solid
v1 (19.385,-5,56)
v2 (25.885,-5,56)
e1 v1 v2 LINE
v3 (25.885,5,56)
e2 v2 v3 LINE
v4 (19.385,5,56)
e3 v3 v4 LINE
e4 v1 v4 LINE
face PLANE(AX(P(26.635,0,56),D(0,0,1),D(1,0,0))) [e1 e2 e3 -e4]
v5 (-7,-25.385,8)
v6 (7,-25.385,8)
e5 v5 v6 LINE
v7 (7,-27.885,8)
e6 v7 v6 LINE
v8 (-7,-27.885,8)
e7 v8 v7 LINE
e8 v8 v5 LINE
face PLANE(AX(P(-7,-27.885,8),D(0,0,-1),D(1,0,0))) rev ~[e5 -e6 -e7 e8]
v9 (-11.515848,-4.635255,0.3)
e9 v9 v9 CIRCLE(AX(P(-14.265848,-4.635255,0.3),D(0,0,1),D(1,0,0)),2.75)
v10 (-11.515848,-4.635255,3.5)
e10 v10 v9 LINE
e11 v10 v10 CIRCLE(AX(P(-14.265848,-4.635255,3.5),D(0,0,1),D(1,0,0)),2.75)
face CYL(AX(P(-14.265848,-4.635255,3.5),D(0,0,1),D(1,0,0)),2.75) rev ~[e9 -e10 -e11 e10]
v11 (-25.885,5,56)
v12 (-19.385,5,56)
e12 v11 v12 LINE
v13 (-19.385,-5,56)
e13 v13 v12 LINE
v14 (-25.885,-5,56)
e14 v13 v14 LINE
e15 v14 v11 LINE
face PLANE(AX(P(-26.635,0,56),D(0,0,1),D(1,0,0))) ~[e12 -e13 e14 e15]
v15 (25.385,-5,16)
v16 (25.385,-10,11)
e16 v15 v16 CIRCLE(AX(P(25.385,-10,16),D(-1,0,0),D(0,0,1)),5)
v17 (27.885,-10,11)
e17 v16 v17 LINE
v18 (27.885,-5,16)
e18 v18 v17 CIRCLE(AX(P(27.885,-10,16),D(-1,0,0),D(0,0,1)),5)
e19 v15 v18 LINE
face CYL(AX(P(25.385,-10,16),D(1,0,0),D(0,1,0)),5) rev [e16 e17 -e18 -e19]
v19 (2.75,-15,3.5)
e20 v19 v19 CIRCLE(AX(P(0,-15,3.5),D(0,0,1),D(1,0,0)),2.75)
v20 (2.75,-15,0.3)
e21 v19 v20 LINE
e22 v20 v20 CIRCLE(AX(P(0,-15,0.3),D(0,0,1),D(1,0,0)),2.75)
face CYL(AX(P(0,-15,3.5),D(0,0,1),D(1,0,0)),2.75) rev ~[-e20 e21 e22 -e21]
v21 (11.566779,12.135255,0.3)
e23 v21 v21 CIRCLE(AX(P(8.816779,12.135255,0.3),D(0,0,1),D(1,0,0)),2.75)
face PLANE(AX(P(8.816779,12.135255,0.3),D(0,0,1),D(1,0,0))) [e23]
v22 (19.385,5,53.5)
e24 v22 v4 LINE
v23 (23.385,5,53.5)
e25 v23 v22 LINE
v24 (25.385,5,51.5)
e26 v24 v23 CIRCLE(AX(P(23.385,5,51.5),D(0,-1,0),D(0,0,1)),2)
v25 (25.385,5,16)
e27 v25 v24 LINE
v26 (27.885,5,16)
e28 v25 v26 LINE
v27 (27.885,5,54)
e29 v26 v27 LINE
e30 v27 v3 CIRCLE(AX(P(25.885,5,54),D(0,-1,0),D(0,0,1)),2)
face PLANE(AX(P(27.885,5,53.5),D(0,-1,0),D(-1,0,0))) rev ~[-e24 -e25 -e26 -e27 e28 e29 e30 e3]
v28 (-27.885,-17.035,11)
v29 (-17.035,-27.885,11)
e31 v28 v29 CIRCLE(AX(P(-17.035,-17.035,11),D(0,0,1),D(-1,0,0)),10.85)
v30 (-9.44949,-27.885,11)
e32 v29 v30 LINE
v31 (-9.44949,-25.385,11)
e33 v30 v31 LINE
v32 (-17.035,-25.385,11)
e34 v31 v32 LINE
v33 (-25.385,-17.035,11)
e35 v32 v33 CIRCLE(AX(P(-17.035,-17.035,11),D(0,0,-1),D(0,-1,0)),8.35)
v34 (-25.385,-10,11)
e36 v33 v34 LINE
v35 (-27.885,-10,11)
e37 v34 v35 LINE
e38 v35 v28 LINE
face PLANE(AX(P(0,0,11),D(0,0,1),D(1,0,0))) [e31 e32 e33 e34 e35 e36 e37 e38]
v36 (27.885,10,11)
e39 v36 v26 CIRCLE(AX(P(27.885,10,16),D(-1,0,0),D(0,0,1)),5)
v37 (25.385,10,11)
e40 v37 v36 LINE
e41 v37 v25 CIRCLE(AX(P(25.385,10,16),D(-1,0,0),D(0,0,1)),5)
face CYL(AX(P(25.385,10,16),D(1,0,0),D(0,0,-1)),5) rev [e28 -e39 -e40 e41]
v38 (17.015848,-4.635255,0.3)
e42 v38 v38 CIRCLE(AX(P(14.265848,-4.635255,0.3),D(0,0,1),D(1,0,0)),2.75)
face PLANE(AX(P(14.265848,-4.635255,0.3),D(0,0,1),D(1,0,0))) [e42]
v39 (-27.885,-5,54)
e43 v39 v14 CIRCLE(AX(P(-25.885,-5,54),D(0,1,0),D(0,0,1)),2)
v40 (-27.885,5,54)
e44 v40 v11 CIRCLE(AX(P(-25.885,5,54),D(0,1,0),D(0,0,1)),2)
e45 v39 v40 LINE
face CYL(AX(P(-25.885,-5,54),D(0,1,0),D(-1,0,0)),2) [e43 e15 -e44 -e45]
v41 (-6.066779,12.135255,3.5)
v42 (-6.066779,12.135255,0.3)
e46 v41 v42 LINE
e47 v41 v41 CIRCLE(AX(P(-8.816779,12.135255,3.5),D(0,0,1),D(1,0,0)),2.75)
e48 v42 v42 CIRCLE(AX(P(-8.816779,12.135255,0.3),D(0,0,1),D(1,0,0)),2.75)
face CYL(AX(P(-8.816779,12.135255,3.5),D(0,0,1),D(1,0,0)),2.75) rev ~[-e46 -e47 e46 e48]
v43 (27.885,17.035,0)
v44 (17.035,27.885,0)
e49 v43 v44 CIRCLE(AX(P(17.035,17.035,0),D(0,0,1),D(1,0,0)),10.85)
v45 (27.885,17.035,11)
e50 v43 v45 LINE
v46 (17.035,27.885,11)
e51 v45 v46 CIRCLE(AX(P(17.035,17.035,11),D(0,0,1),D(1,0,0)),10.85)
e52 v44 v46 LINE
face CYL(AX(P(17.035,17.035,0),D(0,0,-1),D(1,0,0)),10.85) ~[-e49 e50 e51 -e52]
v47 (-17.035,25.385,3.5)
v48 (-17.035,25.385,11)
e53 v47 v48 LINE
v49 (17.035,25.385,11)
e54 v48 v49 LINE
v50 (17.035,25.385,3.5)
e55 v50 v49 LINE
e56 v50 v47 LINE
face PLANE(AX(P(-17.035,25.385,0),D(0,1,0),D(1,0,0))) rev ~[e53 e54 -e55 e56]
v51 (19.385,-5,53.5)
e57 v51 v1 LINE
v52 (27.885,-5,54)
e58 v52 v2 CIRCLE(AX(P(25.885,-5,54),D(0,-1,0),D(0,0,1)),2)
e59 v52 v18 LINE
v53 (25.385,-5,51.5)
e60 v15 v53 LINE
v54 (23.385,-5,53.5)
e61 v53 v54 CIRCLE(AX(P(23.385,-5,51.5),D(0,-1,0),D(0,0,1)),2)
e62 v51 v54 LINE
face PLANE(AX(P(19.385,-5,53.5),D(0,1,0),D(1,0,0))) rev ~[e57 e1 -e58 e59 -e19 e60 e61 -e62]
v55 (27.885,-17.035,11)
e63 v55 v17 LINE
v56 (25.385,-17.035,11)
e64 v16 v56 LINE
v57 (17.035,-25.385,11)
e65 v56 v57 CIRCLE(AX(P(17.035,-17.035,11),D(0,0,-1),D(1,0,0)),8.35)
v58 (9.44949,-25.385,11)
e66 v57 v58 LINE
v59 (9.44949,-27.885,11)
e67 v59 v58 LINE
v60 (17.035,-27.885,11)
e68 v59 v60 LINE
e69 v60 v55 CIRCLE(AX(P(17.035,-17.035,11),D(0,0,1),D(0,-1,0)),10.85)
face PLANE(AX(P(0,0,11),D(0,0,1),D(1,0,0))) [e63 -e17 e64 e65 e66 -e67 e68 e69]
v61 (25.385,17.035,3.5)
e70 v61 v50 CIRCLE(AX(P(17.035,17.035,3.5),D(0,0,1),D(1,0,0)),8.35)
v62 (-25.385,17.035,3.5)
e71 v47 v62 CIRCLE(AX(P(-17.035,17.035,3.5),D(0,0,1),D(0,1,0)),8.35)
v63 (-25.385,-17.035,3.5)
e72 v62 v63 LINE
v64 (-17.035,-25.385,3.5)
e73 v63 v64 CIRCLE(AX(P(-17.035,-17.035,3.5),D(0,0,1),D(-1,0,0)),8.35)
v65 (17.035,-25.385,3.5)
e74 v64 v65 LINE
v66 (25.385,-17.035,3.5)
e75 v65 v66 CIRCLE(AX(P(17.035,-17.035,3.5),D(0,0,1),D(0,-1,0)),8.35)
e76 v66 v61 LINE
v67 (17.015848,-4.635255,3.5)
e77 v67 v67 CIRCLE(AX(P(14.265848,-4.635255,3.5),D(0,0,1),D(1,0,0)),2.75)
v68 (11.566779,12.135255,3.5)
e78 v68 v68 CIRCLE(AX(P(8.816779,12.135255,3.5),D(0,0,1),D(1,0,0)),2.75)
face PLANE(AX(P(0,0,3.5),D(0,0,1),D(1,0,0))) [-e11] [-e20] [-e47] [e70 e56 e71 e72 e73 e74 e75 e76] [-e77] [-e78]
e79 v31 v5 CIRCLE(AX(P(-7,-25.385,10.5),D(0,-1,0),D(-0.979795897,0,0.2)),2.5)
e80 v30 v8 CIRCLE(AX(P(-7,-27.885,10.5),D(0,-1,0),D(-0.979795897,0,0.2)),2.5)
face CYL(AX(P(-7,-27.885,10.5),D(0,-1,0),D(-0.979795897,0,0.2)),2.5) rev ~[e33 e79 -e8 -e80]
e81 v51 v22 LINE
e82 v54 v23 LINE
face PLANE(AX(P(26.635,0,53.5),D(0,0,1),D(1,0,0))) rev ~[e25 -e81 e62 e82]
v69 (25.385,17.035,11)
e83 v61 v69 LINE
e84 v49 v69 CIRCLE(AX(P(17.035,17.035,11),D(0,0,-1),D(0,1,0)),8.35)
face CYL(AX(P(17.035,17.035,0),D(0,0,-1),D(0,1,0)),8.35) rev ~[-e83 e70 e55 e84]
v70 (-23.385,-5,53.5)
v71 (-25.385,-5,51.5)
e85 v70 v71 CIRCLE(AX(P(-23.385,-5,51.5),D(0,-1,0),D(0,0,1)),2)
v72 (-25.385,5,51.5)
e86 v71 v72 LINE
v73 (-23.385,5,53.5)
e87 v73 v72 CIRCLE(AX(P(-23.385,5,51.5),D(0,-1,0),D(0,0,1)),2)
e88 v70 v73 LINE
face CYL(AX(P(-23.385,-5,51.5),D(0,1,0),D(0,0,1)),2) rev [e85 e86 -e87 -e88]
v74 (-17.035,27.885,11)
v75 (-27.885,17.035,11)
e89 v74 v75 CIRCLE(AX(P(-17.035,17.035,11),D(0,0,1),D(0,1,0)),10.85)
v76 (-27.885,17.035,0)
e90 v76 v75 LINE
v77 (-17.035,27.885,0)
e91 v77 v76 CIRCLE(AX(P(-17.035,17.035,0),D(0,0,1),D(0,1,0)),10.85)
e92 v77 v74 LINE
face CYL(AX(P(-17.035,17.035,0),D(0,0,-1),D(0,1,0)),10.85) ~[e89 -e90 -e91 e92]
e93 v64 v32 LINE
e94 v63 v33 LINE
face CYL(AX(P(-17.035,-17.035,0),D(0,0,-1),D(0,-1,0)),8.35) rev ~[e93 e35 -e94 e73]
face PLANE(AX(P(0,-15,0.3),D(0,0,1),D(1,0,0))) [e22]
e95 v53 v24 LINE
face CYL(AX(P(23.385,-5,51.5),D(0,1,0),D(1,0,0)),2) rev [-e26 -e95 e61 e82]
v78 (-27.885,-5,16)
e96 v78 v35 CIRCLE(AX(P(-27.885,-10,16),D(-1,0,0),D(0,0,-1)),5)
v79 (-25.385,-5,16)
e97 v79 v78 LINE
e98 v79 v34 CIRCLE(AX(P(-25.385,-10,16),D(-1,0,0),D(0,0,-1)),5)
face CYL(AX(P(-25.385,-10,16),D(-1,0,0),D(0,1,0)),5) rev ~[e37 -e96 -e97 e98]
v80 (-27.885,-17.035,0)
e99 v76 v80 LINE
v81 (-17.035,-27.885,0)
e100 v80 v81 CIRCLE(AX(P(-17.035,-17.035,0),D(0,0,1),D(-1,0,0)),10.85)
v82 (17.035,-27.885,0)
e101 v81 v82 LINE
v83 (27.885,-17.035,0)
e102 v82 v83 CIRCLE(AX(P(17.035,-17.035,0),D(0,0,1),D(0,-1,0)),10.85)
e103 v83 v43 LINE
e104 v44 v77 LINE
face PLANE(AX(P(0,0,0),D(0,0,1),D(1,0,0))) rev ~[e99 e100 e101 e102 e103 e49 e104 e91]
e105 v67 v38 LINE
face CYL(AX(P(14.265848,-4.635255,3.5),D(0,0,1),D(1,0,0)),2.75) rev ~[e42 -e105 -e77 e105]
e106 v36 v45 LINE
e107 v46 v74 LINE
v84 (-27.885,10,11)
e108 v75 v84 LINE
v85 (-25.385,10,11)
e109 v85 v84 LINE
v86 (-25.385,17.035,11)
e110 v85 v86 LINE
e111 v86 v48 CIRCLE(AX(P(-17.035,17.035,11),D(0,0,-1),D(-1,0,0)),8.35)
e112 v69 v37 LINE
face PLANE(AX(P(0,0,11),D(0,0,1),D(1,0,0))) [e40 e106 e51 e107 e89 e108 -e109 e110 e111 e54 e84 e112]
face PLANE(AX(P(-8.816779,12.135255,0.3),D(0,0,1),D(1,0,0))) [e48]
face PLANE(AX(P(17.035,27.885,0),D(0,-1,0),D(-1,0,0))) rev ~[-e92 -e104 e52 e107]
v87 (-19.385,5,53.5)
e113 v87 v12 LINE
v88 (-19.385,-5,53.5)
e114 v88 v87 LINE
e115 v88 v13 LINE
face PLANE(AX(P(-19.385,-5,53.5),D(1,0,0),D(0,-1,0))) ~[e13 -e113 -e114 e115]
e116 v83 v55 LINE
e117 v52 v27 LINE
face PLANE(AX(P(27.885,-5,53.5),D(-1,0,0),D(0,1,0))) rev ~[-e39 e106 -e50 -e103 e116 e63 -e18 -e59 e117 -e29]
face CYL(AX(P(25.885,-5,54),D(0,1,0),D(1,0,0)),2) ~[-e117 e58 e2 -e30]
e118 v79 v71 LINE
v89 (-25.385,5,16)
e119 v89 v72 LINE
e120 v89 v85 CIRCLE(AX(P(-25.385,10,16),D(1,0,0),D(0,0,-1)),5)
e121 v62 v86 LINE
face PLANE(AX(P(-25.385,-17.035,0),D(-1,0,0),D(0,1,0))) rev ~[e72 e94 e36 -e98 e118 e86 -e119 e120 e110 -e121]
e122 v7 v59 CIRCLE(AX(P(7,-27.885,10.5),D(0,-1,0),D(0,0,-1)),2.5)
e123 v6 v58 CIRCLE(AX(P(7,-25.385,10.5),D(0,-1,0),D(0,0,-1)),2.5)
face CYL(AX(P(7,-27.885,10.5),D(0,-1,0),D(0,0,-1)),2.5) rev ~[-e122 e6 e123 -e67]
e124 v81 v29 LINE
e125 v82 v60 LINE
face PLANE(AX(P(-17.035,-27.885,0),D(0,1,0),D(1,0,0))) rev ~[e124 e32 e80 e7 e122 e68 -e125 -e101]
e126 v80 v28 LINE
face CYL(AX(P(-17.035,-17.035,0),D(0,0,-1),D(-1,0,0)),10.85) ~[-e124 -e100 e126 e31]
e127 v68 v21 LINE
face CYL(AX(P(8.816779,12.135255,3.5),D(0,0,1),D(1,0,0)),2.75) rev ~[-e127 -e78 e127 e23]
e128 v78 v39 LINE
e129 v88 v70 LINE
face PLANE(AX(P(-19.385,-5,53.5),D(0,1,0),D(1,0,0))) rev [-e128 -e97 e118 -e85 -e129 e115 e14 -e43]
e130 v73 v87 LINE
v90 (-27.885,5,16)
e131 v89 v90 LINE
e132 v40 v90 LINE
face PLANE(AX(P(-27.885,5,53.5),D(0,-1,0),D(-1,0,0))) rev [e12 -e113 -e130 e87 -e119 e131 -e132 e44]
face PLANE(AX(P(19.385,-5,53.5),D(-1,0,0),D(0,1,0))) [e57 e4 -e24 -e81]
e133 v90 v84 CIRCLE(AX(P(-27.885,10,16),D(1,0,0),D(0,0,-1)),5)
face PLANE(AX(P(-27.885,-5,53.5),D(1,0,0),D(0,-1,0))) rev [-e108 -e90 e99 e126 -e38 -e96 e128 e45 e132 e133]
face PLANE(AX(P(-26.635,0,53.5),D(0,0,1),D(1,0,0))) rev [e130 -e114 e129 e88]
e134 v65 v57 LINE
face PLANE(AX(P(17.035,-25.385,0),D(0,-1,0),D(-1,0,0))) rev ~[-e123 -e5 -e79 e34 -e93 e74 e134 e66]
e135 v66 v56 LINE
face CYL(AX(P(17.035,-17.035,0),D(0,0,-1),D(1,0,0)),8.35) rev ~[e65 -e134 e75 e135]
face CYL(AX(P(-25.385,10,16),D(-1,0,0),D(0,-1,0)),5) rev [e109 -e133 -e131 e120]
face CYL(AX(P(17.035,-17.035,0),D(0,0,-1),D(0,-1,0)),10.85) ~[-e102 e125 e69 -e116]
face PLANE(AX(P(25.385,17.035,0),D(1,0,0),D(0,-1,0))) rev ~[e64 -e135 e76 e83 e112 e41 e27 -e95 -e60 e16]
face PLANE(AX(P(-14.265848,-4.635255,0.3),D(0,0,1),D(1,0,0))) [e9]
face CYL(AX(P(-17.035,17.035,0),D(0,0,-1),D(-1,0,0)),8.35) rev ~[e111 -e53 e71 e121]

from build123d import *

# Parameters (mm, degrees)
F1_DEPTH  = 3.5
F2_DEPTH  = 11
F4_DEPTH  = 25
F5_W      = 2.5
F5_H      = 10
F6_DEPTH  = 42.5
F7_W      = 2.5
F7_H      = 10
F7_W_2    = 6
F8_DEPTH  = 2.5
F9_R      = 2
F10_R     = 5
F11_R     = 2.75
F12_DEPTH = 3.2


# Not quite as in the source:
# - a pattern or mirror of a feature is missing from the dataset's text; its kind, count and spacing are read off the source's solid


with BuildPart() as f1:
    # F0 (on Top) → F1 (new body)
    with BuildSketch(Plane.XY):
        with BuildLine():
            ThreePointArc((25.385, 17.035), (22.9393416229, 22.9393416229), (17.035, 25.385))
            Line((17.035, 25.385), (-17.035, 25.385))
            ThreePointArc((-17.035, 25.385), (-22.9393416229, 22.9393416229), (-25.385, 17.035))
            Line((-25.385, 17.035), (-25.385, -17.035))
            ThreePointArc((-25.385, -17.035), (-22.9393416229, -22.9393416229), (-17.035, -25.385))
            Line((-17.035, -25.385), (17.035, -25.385))
            ThreePointArc((17.035, -25.385), (22.9393416229, -22.9393416229), (25.385, -17.035))
            Line((25.385, -17.035), (25.385, 17.035))
        make_face()
    extrude(amount=F1_DEPTH)

    # F0 (on Top) → F2 (join)
    with BuildSketch(Plane.XY):
        with BuildLine():
            ThreePointArc((27.885, 17.035), (24.7071085759, 24.7071085759), (17.035, 27.885))
            Line((17.035, 27.885), (-17.035, 27.885))
            ThreePointArc((-17.035, 27.885), (-24.7071085759, 24.7071085759), (-27.885, 17.035))
            Line((-27.885, 17.035), (-27.885, -17.035))
            ThreePointArc((-27.885, -17.035), (-24.7071085759, -24.7071085759), (-17.035, -27.885))
            Line((-17.035, -27.885), (17.035, -27.885))
            ThreePointArc((17.035, -27.885), (24.7071085759, -24.7071085759), (27.885, -17.035))
            Line((27.885, -17.035), (27.885, 17.035))
        make_face()
        with BuildLine():
            Line((-17.035, 25.385), (17.035, 25.385))
            ThreePointArc((17.035, 25.385), (22.9393416229, 22.9393416229), (25.385, 17.035))
            Line((25.385, 17.035), (25.385, -17.035))
            ThreePointArc((25.385, -17.035), (22.9393416229, -22.9393416229), (17.035, -25.385))
            Line((17.035, -25.385), (-17.035, -25.385))
            ThreePointArc((-17.035, -25.385), (-22.9393416229, -22.9393416229), (-25.385, -17.035))
            Line((-25.385, -17.035), (-25.385, 17.035))
            ThreePointArc((-25.385, 17.035), (-22.9393416229, 22.9393416229), (-17.035, 25.385))
        make_face(mode=Mode.SUBTRACT)
    extrude(amount=F2_DEPTH)

    # F3 (on face) → F4 (cut)
    with BuildSketch(Plane.XZ.offset(27.885)):
        with BuildLine():
            ThreePointArc((-9.4494897428, 11), (-8.9364916731, 8.9188611699), (-7, 8))
            Line((-7, 8), (7, 8))
            ThreePointArc((7, 8), (8.9364916731, 8.9188611699), (9.4494897428, 11))
            Line((9.4494897428, 11), (-9.4494897428, 11))
        make_face()
        with BuildLine():
            ThreePointArc((-7, 13), (-8.5811388301, 12.4364916731), (-9.4494897428, 11))
            Line((-9.4494897428, 11), (9.4494897428, 11))
            ThreePointArc((9.4494897428, 11), (8.5811388301, 12.4364916731), (7, 13))
            Line((7, 13), (-7, 13))
        make_face()
    extrude(amount=-F4_DEPTH, mode=Mode.SUBTRACT)

    # F5 (on face) → F6 (join)
    with BuildSketch(Plane.XY.offset(11)):
        with Locations((26.635, 0)):
            Rectangle(F5_W, F5_H)
    f6 = extrude(amount=F6_DEPTH)

    # F6_copies: F6 across plane
    add(f6.mirror(Plane(origin=(0, 0, 0), x_dir=(0, 0, -1), z_dir=(-1, 0, 0))))

    # F7 (on face) → F8 (join)
    with BuildSketch(Plane.XY.offset(53.5)):
        with Locations((26.635, 0)):
            Rectangle(F7_W, F7_H)
        with Locations((22.385, 0)):
            Rectangle(F7_W_2, F7_H)
    f8 = extrude(amount=F8_DEPTH)

    # F8_copies: F8 across plane
    add(f8.mirror(Plane(origin=(0, 0, 0), x_dir=(0, 0, -1), z_dir=(-1, 0, 0))))

    # F9
    f9_edges = [f1.edges().sort_by_distance(p)[0] for p in [
        (25.385, 0, 53.5),
        (27.885, 0, 56),
        (-25.385, 0, 53.5),
        (-27.885, 0, 56),
    ]]
    fillet(f9_edges, radius=F9_R)

    # F10
    f10_edges = [f1.edges().sort_by_distance(p)[0] for p in [
        (26.635, 5, 11),
        (26.635, -5, 11),
        (-26.635, 5, 11),
        (-26.635, -5, 11),
    ]]
    fillet(f10_edges, radius=F10_R)

    # F11 (on face) → F12 (cut)
    with BuildSketch(Plane.XY.offset(3.5)):
        with Locations((0, -15)):
            Circle(F11_R)
        with Locations((14.2658477444, -4.6352549156)):
            Circle(F11_R)
        with Locations((8.8167787844, 12.1352549156)):
            Circle(F11_R)
        with Locations((-8.8167787844, 12.1352549156)):
            Circle(F11_R)
        with Locations((-14.2658477444, -4.6352549156)):
            Circle(F11_R)
    extrude(amount=-F12_DEPTH, mode=Mode.SUBTRACT)


solid = f1.part
